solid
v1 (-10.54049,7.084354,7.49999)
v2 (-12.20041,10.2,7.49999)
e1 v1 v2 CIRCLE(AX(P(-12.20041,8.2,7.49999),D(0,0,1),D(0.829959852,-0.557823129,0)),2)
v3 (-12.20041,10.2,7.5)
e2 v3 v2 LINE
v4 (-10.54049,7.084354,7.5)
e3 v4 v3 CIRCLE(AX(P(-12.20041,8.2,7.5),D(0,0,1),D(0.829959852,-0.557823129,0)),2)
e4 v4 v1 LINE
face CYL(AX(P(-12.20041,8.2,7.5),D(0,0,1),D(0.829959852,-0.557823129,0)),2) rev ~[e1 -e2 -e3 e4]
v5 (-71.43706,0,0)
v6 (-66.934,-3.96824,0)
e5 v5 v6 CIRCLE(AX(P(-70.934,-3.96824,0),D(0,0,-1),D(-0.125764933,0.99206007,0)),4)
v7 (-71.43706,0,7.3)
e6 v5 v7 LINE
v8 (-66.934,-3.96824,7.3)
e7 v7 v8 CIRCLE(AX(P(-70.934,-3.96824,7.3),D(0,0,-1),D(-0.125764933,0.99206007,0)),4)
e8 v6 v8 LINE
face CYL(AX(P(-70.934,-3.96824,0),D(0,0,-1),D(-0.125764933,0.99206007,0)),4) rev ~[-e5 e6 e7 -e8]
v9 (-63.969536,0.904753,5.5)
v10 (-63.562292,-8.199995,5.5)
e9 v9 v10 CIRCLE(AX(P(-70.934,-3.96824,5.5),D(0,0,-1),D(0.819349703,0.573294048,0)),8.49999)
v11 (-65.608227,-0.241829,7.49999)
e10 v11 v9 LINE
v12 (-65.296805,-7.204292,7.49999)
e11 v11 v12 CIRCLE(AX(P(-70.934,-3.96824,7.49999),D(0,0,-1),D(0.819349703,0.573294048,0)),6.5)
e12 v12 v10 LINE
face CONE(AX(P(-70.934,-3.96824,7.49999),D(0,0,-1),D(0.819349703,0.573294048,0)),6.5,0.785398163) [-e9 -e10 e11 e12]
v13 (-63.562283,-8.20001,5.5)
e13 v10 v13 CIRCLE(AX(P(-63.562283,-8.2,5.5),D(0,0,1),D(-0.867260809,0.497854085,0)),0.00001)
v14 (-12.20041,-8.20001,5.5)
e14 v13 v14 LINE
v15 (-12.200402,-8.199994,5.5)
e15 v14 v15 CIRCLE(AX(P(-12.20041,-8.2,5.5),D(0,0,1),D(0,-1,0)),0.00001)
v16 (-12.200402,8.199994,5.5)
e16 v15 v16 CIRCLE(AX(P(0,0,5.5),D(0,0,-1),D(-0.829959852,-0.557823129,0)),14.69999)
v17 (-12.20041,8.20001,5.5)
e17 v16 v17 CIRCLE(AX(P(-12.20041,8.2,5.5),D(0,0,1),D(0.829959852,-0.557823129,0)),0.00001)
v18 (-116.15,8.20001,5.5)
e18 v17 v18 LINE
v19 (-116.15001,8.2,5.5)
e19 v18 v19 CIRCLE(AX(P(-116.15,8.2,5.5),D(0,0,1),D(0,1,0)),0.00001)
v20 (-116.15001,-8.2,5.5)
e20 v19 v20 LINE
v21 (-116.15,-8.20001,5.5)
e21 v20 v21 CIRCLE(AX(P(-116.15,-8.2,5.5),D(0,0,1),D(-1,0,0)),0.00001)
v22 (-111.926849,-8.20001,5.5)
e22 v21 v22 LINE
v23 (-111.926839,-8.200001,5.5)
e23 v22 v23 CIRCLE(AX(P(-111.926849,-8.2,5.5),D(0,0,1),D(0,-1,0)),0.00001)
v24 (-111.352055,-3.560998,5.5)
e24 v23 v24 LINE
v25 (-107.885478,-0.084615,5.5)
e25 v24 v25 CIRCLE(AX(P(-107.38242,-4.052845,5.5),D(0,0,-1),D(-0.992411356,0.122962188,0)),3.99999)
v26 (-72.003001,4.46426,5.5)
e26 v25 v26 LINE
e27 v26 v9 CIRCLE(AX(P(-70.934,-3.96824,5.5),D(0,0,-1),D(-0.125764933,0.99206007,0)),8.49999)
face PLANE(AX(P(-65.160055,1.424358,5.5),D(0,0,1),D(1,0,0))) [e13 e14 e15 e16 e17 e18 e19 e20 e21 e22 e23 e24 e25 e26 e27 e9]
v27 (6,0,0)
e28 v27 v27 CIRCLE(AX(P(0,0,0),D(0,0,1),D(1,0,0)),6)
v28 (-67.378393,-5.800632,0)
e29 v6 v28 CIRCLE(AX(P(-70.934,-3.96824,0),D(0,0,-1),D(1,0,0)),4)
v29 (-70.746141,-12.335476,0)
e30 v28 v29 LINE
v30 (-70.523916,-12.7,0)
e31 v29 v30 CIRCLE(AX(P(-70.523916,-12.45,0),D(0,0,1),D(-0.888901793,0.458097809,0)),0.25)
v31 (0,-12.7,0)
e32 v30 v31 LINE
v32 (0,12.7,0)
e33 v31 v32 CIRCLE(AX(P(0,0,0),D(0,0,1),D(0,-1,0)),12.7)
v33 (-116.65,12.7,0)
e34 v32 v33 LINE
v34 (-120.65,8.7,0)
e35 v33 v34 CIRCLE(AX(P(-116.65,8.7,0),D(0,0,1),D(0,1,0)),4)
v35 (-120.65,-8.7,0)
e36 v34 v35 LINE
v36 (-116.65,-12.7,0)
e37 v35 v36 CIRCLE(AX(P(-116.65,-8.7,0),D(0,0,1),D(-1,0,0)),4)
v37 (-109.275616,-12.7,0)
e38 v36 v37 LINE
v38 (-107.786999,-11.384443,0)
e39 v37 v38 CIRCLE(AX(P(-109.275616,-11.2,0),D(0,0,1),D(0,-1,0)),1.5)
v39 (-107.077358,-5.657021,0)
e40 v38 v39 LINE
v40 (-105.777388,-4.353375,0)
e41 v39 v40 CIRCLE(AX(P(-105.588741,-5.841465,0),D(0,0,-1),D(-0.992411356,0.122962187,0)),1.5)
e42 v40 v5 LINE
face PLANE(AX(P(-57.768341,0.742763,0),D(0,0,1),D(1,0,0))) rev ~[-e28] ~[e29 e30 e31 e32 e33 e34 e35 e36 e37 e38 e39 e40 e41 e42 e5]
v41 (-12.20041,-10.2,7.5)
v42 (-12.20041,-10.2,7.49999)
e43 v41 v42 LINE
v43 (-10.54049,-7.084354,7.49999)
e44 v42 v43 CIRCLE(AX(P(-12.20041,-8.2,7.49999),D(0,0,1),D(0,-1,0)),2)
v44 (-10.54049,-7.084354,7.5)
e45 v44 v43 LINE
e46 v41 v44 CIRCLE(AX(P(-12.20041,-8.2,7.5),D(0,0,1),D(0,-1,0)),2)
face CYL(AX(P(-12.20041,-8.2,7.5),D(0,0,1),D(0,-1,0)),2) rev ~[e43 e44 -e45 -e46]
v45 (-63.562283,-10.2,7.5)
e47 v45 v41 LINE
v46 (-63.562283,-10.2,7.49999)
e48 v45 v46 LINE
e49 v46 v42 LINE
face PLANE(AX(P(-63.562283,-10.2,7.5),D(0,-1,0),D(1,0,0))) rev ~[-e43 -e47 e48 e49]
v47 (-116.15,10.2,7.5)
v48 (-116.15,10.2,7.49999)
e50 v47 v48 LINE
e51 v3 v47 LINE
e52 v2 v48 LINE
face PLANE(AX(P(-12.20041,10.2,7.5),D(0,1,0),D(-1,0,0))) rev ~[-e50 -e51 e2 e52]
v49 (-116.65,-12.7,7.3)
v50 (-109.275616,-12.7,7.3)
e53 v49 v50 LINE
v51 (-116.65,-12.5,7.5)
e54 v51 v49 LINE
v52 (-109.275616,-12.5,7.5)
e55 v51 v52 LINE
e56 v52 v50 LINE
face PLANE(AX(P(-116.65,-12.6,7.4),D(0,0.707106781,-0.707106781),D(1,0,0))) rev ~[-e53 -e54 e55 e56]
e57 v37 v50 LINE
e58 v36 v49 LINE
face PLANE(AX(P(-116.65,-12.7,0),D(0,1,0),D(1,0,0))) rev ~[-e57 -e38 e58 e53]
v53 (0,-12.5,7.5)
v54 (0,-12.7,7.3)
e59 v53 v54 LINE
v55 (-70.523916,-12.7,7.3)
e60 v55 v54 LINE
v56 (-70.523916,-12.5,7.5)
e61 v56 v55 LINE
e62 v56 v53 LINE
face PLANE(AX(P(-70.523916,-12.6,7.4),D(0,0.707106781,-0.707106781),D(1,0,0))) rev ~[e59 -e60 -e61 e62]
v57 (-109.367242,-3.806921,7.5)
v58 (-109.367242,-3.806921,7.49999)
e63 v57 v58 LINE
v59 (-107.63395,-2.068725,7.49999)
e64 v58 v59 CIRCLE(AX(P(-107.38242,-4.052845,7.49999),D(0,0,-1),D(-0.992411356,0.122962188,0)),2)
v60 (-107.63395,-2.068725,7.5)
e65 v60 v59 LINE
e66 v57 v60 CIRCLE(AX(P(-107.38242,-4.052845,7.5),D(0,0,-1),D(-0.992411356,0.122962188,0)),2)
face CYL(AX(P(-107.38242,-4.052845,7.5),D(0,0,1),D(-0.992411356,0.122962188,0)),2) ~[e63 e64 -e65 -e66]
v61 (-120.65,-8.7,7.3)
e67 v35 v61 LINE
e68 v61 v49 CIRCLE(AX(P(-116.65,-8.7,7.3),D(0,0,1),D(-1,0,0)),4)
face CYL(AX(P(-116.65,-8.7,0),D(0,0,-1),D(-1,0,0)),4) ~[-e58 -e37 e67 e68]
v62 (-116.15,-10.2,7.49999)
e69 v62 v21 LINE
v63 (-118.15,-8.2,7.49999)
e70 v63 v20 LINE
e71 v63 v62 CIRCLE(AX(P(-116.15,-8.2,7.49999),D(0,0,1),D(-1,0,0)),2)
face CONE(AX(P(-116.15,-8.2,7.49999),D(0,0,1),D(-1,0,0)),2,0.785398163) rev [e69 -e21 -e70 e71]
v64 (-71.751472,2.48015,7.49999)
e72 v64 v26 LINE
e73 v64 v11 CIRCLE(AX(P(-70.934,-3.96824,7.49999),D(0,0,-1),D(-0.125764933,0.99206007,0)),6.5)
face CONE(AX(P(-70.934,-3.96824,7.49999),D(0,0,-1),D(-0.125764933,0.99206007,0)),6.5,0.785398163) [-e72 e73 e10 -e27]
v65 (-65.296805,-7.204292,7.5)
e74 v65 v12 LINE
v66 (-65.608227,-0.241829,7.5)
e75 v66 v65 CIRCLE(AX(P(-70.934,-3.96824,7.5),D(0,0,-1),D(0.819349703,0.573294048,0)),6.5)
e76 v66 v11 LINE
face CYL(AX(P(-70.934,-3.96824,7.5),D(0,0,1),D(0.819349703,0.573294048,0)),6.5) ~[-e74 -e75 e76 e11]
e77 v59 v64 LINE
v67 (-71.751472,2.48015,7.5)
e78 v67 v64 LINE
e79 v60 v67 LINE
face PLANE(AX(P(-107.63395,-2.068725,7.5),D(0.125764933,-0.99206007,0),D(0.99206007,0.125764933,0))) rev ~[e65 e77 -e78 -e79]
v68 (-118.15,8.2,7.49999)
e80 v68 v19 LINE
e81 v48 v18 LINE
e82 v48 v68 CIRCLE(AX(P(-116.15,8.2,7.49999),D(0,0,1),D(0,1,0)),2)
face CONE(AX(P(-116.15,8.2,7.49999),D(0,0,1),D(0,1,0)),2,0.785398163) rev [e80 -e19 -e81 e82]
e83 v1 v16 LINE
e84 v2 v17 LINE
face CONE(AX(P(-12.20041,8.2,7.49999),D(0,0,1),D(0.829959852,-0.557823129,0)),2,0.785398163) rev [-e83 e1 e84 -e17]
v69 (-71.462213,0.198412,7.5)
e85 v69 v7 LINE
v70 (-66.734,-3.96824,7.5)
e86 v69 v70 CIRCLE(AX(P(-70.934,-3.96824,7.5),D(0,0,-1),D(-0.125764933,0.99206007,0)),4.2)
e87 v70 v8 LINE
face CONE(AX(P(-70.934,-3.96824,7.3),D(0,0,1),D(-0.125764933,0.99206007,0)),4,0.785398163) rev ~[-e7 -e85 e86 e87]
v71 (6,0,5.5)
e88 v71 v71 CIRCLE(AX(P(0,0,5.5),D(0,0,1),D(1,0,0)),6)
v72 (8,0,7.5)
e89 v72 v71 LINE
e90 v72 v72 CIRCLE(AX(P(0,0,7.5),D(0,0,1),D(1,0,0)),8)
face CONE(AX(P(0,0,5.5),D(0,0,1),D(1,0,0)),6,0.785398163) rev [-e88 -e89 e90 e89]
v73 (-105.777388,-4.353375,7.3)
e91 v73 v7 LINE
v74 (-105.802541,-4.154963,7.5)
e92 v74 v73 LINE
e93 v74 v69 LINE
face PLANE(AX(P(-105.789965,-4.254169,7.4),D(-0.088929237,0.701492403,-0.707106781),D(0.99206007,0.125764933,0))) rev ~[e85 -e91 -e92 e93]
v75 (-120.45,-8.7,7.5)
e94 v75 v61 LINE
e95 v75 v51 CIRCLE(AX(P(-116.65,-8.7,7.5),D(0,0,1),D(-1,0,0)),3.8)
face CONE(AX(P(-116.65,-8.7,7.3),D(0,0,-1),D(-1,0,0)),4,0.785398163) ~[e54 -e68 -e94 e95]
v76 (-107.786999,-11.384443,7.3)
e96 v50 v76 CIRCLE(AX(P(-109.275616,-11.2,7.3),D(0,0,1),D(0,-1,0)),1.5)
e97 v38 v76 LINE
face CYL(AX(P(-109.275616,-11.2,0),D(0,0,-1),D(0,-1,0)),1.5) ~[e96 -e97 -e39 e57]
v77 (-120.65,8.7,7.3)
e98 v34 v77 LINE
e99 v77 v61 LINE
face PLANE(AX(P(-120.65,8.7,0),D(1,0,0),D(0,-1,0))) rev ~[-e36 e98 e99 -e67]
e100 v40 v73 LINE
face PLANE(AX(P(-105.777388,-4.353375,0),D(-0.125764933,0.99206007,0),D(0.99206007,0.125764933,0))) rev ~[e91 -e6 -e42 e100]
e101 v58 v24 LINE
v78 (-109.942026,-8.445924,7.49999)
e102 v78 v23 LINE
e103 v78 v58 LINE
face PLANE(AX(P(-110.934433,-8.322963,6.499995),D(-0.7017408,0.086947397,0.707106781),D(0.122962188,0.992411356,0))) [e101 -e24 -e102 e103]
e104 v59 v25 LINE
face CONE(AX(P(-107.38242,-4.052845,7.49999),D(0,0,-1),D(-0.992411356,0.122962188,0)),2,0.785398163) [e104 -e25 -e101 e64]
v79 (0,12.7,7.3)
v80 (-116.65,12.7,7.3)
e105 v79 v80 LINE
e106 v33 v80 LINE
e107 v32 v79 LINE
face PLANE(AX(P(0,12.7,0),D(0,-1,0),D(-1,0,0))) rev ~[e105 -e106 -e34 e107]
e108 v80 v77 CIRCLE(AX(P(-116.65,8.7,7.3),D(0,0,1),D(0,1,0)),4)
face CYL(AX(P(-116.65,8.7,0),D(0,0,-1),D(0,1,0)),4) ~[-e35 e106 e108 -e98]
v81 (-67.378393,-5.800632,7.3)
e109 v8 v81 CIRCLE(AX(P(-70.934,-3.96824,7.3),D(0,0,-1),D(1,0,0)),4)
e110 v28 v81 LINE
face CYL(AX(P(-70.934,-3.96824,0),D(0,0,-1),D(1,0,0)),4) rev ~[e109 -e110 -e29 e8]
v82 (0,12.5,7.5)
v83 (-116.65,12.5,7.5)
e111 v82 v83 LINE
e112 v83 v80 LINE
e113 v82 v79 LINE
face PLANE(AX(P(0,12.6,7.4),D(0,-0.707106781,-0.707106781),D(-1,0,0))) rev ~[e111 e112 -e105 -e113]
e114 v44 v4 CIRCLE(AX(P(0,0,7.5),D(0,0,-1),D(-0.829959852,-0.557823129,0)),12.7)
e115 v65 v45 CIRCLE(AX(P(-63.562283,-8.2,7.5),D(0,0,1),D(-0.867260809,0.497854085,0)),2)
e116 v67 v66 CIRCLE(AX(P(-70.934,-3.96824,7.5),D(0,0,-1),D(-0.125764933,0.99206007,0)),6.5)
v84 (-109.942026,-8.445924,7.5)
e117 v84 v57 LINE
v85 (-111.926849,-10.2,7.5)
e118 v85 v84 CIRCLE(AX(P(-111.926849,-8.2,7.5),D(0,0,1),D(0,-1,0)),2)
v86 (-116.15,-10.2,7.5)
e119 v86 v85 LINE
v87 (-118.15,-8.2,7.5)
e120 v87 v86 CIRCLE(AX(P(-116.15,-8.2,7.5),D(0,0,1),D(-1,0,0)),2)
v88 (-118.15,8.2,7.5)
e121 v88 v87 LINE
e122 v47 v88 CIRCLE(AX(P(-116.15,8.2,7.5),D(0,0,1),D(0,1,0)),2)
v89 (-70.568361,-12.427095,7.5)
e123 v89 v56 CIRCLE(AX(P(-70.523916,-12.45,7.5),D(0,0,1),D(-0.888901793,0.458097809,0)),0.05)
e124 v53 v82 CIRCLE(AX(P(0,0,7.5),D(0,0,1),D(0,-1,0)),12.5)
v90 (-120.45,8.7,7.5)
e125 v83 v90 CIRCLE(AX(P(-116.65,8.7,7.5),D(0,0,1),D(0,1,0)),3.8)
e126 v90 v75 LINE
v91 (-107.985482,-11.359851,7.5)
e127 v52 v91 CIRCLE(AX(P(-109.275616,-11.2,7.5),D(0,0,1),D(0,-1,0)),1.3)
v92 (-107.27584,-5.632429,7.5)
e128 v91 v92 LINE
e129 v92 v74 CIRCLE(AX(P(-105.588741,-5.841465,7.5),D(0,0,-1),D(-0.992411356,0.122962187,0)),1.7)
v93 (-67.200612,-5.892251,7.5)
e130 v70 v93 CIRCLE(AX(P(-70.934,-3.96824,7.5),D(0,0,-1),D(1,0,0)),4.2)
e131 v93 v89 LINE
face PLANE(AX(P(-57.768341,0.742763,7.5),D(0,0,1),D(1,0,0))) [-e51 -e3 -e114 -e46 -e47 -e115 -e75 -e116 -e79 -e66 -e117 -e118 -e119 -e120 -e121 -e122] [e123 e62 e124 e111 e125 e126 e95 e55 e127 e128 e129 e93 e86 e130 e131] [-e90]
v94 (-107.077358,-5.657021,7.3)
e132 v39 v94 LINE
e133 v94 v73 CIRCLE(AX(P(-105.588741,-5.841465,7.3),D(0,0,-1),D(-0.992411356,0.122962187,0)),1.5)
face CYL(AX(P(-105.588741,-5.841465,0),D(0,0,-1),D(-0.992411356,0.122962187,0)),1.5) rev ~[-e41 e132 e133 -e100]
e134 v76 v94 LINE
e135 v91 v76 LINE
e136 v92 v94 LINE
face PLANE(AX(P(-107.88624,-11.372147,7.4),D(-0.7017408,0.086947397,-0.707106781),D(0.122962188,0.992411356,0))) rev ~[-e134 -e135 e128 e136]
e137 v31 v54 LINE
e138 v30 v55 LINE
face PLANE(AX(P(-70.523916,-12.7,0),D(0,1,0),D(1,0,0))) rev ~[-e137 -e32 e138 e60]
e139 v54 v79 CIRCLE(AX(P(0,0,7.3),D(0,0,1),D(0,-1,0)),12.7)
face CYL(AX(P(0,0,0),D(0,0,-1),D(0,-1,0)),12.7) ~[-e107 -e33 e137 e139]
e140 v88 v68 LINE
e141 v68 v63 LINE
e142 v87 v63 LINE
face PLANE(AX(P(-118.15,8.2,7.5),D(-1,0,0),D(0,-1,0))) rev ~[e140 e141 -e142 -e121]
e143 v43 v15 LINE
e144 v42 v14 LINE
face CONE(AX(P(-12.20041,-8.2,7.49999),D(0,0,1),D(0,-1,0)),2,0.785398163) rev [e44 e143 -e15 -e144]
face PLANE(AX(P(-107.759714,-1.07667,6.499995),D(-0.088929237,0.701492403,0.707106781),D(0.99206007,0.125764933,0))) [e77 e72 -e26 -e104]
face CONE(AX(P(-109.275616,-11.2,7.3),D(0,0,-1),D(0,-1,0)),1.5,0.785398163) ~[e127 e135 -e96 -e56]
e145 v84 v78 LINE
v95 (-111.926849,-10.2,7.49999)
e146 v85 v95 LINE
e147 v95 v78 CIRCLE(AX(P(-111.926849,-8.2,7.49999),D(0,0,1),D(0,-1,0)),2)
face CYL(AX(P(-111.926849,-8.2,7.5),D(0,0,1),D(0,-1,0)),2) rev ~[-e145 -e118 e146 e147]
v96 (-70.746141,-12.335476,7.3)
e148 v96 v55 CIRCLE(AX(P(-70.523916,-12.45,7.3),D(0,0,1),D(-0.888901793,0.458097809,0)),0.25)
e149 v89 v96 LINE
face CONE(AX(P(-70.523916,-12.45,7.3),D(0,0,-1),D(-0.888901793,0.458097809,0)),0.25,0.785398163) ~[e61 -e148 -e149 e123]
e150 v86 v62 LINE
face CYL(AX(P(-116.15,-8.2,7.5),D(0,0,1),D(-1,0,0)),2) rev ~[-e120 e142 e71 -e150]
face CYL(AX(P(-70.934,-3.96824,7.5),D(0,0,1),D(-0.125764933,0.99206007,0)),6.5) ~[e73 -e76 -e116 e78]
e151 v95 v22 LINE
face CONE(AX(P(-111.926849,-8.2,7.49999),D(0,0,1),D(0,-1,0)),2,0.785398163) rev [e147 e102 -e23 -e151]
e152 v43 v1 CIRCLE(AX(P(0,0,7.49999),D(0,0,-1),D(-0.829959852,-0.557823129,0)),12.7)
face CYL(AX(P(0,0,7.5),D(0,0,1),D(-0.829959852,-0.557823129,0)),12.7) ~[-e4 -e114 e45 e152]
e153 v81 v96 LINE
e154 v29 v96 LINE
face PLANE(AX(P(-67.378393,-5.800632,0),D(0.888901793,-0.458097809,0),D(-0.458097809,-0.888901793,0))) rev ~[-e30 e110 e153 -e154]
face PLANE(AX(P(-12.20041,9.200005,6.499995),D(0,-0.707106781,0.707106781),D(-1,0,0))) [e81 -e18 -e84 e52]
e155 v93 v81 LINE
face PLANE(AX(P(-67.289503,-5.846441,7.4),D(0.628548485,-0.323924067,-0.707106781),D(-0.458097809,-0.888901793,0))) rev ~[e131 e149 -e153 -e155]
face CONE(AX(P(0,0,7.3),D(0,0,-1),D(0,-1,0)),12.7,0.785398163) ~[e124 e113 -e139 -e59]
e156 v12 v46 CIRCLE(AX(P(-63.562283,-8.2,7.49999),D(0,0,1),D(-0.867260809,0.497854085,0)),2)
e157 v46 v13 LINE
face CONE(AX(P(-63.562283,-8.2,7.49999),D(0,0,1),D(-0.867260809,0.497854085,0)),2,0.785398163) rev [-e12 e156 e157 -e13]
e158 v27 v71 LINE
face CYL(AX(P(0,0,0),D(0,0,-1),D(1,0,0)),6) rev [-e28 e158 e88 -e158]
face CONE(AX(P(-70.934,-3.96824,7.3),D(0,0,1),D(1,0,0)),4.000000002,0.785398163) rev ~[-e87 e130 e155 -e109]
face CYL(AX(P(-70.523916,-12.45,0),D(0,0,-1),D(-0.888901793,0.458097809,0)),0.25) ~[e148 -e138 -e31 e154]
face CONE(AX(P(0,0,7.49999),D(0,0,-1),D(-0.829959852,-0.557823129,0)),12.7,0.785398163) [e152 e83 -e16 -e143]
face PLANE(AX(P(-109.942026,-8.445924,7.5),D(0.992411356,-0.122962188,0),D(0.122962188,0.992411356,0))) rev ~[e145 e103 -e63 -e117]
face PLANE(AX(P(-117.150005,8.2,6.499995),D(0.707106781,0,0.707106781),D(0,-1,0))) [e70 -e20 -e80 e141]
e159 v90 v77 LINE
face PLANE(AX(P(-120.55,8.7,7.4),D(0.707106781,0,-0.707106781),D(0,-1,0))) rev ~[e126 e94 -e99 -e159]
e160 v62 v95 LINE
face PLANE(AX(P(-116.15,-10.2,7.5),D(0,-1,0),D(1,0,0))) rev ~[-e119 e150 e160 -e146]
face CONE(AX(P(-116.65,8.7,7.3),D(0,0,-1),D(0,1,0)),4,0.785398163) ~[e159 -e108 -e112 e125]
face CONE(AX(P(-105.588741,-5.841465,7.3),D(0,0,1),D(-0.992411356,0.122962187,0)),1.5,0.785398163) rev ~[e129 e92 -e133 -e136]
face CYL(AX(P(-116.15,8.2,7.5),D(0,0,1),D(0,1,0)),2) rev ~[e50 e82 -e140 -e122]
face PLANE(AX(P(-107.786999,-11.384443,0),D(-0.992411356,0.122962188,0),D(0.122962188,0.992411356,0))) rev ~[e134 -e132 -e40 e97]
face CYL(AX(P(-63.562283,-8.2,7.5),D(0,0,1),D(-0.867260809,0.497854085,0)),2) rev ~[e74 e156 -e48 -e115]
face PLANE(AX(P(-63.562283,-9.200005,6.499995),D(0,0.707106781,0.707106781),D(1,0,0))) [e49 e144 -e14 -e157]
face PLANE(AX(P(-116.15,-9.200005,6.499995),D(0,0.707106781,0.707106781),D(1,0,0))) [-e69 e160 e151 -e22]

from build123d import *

# Parameters (mm, degrees)
F0_R     = 6
F1_DEPTH = 7.5
F3_DEPTH = 2
F4_SIZE  = 1.99999
F5_SIZE  = 2
F6_SIZE  = 0.2


# Not quite as in the source:
# - a fillet or chamfer is up to 0.001 mm smaller than in the source, because OpenCascade refuses the exact size


with BuildPart() as f1:
    # F0 (on Top) → F1 (new body)
    with BuildSketch(Plane.XY):
        with BuildLine():
            Line((0, 12.7), (-116.65, 12.7))
            ThreePointArc((-116.65, 12.7), (-119.4784271247, 11.5284271247), (-120.65, 8.7))
            Line((-120.65, 8.7), (-120.65, -8.7))
            ThreePointArc((-120.65, -8.7), (-119.4784271247, -11.5284271247), (-116.65, -12.7))
            Line((-116.65, -12.7), (-109.2756163486, -12.7))
            ThreePointArc((-109.2756163486, -12.7), (-108.2823049478, -12.323980632), (-107.7869993139, -11.3844432814))
            Line((-107.7869993139, -11.3844432814), (-107.0773577752, -5.6570214144))
            ThreePointArc((-107.0773577752, -5.6570214144), (-106.6508978642, -4.7823035915), (-105.77738814, -4.3533745914))
            Line((-105.77738814, -4.3533745914), (-71.4370597318, 0))
            ThreePointArc((-71.4370597318, 0), (-68.2894054117, -0.967220541), (-66.934, -3.9682402783))
            ThreePointArc((-66.934, -3.9682402783), (-67.0466854589, -4.910994572), (-67.3783928291, -5.8006315156))
            Line((-67.3783928291, -5.8006315156), (-70.7461413924, -12.3354755477))
            ThreePointArc((-70.7461413924, -12.3354755477), (-70.7373768459, -12.5801324074), (-70.5239159442, -12.7))
            Line((-70.5239159442, -12.7), (0, -12.7))
            ThreePointArc((0, -12.7), (12.7, 0), (0, 12.7))
        make_face()
        Circle(F0_R, mode=Mode.SUBTRACT)
    extrude(amount=F1_DEPTH)

    # F2 (on face) → F3 (cut)
    with BuildSketch(Plane.XY.offset(7.5)):
        with BuildLine():
            ThreePointArc((-10.5404901245, -7.0843537415), (-12.7, 0), (-10.5404901245, 7.0843537415))
            ThreePointArc((-10.5404901245, 7.0843537415), (-10.4352904965, 9.1404008409), (-12.2004098292, 10.2))
            Line((-12.2004098292, 10.2), (-116.15, 10.2))
            ThreePointArc((-116.15, 10.2), (-117.5642135624, 9.6142135624), (-118.15, 8.2))
            Line((-118.15, 8.2), (-118.15, -8.2))
            ThreePointArc((-118.15, -8.2), (-117.5642135624, -9.6142135624), (-116.15, -10.2))
            Line((-116.15, -10.2), (-111.9268490457, -10.2))
            ThreePointArc((-111.9268490457, -10.2), (-110.6024338446, -9.6986408426), (-109.9420263328, -8.4459243752))
            Line((-109.9420263328, -8.4459243752), (-109.3672424661, -3.8069207262))
            ThreePointArc((-109.3672424661, -3.8069207262), (-108.7986292513, -2.6406302958), (-107.6339496191, -2.0687249623))
            Line((-107.6339496191, -2.0687249623), (-71.7514720642, 2.4801501739))
            ThreePointArc((-71.7514720642, 2.4801501739), (-68.3008484478, 1.9745295223), (-65.6082269333, -0.2418289696))
            ThreePointArc((-65.6082269333, -0.2418289696), (-64.4404924053, -3.6777938671), (-65.2968047441, -7.2042918302))
            ThreePointArc((-65.2968047441, -7.2042918302), (-65.2930945463, -9.2021436175), (-63.5622831269, -10.2))
            Line((-63.5622831269, -10.2), (-12.2004098292, -10.2))
            ThreePointArc((-12.2004098292, -10.2), (-10.4352904965, -9.1404008409), (-10.5404901245, -7.0843537415))
        make_face()
    extrude(amount=-F3_DEPTH, mode=Mode.SUBTRACT)

    # F4 (size 2 in the source; OpenCascade refuses exactly that, so slightly less here)
    f4_edges = [f1.edges().sort_by_distance(p)[0] for p in [
        (-12.7, 0, 5.5),
        (-10.43529, 9.140401, 5.5),
        (-64.175205, 10.2, 5.5),
        (-117.564214, 9.614214, 5.5),
        (-118.15, 0, 5.5),
        (-117.564214, -9.614214, 5.5),
        (-114.038425, -10.2, 5.5),
        (-110.602434, -9.698641, 5.5),
        (-109.654634, -6.126423, 5.5),
        (-108.798629, -2.64063, 5.5),
        (-89.692711, 0.205713, 5.5),
        (-65.525254, -0.363318, 5.5),
        (-65.293095, -9.202144, 5.5),
        (-37.881346, -10.2, 5.5),
        (-10.43529, -9.140401, 5.5),
    ]]
    chamfer(f4_edges, length=F4_SIZE)

    # F5
    f5_edges = [f1.edges().sort_by_distance(p)[0] for p in [
        (-6, 0, 7.5),
    ]]
    chamfer(f5_edges, length=F5_SIZE)

    # F6
    f6_edges = [f1.edges().sort_by_distance(p)[0] for p in [
        (-58.325, 12.7, 7.5),
    ]]
    chamfer(f6_edges, length=F6_SIZE)


solid = f1.part
